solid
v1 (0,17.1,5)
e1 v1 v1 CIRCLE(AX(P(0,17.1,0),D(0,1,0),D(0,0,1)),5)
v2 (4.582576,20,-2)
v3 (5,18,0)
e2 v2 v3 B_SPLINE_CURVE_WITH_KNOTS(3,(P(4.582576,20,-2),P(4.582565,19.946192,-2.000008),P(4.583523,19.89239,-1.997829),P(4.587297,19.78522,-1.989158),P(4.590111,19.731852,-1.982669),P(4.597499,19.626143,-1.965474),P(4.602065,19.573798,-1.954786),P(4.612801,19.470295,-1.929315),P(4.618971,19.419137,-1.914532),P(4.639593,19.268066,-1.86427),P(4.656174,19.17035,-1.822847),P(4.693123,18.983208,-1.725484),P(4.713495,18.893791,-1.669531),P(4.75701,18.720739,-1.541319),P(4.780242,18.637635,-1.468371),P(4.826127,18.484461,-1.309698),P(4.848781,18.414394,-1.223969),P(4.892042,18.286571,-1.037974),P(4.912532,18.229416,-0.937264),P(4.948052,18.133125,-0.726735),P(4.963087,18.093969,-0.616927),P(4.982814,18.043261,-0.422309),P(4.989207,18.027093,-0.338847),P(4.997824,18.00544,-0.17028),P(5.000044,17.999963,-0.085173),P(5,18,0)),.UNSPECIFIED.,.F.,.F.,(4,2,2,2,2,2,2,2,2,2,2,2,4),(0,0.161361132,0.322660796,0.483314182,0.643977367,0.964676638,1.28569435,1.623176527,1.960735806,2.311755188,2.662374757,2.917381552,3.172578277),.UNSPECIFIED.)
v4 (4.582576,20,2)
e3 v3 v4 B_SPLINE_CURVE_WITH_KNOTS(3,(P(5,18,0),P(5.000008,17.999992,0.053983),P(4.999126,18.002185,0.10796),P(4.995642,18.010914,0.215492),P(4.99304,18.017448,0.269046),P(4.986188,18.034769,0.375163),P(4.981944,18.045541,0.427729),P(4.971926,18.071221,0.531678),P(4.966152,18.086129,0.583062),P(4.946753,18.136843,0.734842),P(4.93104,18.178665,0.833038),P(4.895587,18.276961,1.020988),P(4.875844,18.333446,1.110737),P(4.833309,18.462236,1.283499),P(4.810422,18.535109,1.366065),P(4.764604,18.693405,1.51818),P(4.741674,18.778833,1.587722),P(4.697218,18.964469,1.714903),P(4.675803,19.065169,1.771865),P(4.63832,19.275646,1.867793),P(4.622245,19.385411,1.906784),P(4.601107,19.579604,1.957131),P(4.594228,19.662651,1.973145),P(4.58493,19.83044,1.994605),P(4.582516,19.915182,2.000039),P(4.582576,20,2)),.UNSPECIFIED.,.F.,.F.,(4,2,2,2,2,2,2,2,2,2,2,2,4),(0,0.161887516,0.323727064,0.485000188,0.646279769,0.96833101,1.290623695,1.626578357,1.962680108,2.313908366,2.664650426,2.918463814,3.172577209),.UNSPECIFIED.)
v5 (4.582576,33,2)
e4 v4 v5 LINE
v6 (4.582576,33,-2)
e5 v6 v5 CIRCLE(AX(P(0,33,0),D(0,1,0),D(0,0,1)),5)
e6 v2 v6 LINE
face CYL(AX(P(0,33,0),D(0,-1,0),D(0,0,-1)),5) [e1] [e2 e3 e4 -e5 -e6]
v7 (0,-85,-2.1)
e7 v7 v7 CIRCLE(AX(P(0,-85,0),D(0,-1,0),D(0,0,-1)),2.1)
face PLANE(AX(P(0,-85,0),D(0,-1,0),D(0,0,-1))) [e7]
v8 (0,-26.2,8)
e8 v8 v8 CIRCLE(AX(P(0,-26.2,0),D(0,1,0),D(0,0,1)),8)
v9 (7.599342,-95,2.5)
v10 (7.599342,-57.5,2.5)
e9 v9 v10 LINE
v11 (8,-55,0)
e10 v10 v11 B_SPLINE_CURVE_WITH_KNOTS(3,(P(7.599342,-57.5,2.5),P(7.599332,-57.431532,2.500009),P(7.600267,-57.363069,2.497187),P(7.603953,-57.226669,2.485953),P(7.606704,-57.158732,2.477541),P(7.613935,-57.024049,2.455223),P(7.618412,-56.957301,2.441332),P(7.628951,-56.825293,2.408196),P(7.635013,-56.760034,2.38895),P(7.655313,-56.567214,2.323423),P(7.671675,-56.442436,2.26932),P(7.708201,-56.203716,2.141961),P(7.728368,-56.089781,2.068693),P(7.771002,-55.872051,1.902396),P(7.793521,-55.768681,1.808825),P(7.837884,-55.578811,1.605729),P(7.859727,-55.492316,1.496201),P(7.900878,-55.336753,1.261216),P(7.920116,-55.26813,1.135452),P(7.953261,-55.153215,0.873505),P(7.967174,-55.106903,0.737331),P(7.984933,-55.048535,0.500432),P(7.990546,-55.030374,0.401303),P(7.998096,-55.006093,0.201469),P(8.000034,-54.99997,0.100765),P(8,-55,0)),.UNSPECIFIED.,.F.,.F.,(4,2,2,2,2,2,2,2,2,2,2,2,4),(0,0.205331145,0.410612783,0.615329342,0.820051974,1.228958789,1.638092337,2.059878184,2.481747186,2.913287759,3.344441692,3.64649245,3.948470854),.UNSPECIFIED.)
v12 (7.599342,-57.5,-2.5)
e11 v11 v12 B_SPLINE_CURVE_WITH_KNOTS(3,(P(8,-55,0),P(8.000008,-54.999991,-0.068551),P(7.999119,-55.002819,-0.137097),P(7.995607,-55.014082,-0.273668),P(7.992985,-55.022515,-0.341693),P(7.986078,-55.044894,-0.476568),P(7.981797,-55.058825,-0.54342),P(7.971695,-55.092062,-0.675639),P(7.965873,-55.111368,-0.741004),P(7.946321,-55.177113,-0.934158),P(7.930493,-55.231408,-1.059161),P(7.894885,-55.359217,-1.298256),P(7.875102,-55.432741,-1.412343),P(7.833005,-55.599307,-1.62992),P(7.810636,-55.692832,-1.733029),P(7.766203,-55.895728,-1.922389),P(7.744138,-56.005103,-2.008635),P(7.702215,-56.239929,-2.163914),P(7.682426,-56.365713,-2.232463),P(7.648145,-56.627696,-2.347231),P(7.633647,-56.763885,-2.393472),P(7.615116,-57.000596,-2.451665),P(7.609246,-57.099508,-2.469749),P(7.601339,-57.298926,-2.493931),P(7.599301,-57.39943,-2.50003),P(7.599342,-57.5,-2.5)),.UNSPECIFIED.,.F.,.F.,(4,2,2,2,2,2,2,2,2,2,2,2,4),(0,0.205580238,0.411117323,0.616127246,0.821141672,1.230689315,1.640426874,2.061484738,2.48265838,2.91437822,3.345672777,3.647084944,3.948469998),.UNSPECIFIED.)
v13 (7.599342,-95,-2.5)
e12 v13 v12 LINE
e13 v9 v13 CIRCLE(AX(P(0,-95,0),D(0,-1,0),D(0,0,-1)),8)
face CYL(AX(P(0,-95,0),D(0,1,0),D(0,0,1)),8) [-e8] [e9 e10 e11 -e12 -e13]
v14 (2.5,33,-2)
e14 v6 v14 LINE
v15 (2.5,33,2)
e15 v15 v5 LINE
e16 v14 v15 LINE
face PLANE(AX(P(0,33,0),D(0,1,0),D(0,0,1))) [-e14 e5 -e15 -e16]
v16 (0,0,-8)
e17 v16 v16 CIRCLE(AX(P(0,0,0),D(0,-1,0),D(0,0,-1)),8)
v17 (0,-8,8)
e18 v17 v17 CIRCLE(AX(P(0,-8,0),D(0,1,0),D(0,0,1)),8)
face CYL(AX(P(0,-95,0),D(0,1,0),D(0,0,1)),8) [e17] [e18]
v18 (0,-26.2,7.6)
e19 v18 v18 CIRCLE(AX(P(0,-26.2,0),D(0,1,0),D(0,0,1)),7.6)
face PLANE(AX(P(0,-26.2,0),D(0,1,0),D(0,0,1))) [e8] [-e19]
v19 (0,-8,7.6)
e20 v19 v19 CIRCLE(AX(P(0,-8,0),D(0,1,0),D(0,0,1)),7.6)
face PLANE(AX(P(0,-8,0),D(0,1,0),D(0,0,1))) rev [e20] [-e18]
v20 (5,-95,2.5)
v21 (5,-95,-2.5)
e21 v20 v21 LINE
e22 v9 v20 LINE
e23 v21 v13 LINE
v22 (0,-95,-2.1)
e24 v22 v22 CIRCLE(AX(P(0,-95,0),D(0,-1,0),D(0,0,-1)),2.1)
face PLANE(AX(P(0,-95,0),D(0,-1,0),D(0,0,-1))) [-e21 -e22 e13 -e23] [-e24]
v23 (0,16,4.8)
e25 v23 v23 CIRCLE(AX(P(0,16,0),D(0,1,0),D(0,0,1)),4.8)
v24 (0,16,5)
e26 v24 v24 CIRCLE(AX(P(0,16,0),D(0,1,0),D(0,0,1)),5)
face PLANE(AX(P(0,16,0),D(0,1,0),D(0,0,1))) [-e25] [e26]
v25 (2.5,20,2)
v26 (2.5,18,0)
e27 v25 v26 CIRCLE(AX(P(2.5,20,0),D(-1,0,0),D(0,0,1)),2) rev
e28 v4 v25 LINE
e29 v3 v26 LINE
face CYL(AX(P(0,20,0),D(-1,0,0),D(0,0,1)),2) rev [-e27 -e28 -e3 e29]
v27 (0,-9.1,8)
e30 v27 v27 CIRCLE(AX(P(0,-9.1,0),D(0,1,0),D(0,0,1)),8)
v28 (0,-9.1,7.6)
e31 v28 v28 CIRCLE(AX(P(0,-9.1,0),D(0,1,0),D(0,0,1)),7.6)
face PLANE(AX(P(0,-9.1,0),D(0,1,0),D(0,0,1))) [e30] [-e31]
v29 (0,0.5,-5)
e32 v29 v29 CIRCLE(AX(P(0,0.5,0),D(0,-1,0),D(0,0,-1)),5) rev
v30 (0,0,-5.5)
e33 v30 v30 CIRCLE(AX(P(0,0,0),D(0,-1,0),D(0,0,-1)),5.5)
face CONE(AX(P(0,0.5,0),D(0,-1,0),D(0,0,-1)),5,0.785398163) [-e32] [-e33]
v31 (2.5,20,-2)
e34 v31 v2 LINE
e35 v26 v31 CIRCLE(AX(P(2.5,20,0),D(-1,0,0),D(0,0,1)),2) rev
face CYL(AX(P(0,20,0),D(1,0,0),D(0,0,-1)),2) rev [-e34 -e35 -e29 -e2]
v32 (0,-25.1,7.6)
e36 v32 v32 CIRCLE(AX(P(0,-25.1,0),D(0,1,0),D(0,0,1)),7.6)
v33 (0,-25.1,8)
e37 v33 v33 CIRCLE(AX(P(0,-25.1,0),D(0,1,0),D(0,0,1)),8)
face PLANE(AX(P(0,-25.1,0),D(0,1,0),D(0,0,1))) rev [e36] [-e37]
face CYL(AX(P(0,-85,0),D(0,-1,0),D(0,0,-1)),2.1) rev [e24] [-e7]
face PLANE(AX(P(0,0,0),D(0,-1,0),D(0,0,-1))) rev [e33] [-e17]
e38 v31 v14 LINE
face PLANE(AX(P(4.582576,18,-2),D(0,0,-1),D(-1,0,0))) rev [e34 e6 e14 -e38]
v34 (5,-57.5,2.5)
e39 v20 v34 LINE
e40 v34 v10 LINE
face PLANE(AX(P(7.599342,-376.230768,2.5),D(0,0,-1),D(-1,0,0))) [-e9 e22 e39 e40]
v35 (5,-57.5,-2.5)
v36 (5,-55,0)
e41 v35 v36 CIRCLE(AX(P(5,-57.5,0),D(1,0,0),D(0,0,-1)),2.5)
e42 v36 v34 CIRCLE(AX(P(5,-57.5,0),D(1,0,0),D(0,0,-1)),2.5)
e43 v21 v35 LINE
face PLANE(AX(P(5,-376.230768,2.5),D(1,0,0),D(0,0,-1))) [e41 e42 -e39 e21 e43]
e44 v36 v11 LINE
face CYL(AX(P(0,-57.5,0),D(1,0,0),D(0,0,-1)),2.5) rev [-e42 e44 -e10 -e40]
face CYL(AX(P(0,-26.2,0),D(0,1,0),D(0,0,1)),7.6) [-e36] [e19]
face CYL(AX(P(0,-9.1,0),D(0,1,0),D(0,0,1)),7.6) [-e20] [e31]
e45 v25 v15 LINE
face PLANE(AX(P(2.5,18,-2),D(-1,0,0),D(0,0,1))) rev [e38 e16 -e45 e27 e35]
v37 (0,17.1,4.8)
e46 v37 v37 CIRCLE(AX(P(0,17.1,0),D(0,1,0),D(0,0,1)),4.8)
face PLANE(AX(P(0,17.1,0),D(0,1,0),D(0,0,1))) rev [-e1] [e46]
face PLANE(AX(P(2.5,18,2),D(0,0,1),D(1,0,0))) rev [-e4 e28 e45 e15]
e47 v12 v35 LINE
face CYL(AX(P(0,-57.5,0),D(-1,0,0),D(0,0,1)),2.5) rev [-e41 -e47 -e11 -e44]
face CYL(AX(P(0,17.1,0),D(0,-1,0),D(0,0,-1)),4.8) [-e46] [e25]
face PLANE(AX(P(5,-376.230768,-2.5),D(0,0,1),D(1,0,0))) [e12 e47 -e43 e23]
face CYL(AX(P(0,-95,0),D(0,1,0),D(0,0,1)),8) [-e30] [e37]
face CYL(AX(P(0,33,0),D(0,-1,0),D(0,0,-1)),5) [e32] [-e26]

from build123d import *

# Parameters (mm, degrees)
SKETCH1_R               = 5
BOSS_EXTRUDE1_DEPTH     = 33
SKETCH2_R               = 8
BOSS_EXTRUDE2_DEPTH     = 95
CUT_EXTRUDE1_START      = -8
SKETCH3_OUTSIDE_W       = 43.996
SKETCH3_OUTSIDE_H       = 43.996
SKETCH3_OUTSIDE_R       = 7.6
CUT_EXTRUDE1_DEPTH      = 1.1
CUT_EXTRUDE2_START      = -25.1
SKETCH3_2_OUTSIDE_W     = 43.996
SKETCH3_2_OUTSIDE_H     = 43.996
SKETCH3_2_OUTSIDE_R     = 7.6
CUT_EXTRUDE2_DEPTH      = 1.1
CUT_EXTRUDE3_START      = 16
SKETCH4_OUTSIDE_W       = 43.996
SKETCH4_OUTSIDE_H       = 43.996
SKETCH4_OUTSIDE_R       = 4.8
CUT_EXTRUDE3_DEPTH      = 1.1
SKETCH5_R               = 2.1
CUT_EXTRUDE4_DEPTH      = 10
CUT_EXTRUDE5_START      = -15
CUT_EXTRUDE5_DEPTH      = 15
FILLET1_R               = 2
CUT_EXTRUDE6_DEPTH      = 129.499027333
CUT_EXTRUDE6_DEPTH_BACK = 40
FILLET2_R               = 2.5
CHAMFER1_SIZE           = 0.5


with BuildPart() as part:
    # Sketch1 → Boss-Extrude1 (new body)
    with BuildSketch(Plane(origin=(0, 0, 0), x_dir=(1, 0, 0), z_dir=(0, 1, 0))):
        with Locations(Location((0, 0, 0), (0, 0, 270))):
            Circle(SKETCH1_R)
    extrude(amount=BOSS_EXTRUDE1_DEPTH)

    # Sketch2 → Boss-Extrude2 (add)
    with BuildSketch(Plane.XZ):
        with Locations(Location((0, 0, 0), (0, 0, 270))):
            Circle(SKETCH2_R)
    extrude(amount=BOSS_EXTRUDE2_DEPTH)

    # Sketch3 outside → Cut-Extrude1 (cut)
    with BuildSketch(Plane(origin=(0, 0, 0), x_dir=(1, 0, 0), z_dir=(0, 1, 0)).offset(CUT_EXTRUDE1_START)):
        Rectangle(SKETCH3_OUTSIDE_W, SKETCH3_OUTSIDE_H)
        with Locations(Location((0, 0, 0), (0, 0, 270))):
            Circle(SKETCH3_OUTSIDE_R, mode=Mode.SUBTRACT)
    extrude(amount=-CUT_EXTRUDE1_DEPTH, mode=Mode.SUBTRACT)

    # Sketch3<2> outside → Cut-Extrude2 (cut)
    with BuildSketch(Plane(origin=(0, 0, 0), x_dir=(1, 0, 0), z_dir=(0, 1, 0)).offset(CUT_EXTRUDE2_START)):
        Rectangle(SKETCH3_2_OUTSIDE_W, SKETCH3_2_OUTSIDE_H)
        with Locations(Location((0, 0, 0), (0, 0, 270))):
            Circle(SKETCH3_2_OUTSIDE_R, mode=Mode.SUBTRACT)
    extrude(amount=-CUT_EXTRUDE2_DEPTH, mode=Mode.SUBTRACT)

    # Sketch4 outside → Cut-Extrude3 (cut)
    with BuildSketch(Plane(origin=(0, 0, 0), x_dir=(1, 0, 0), z_dir=(0, 1, 0)).offset(CUT_EXTRUDE3_START)):
        Rectangle(SKETCH4_OUTSIDE_W, SKETCH4_OUTSIDE_H)
        with Locations(Location((0, 0, 0), (0, 0, 270))):
            Circle(SKETCH4_OUTSIDE_R, mode=Mode.SUBTRACT)
    extrude(amount=CUT_EXTRUDE3_DEPTH, mode=Mode.SUBTRACT)

    # Sketch5 → Cut-Extrude4 (cut)
    with BuildSketch(Plane.XZ.offset(95)):
        with Locations(Location((0, 0, 0), (0, 0, 270))):
            Circle(SKETCH5_R)
    extrude(amount=-CUT_EXTRUDE4_DEPTH, mode=Mode.SUBTRACT)

    # Sketch6 → Cut-Extrude5 (cut)
    with BuildSketch(Plane(origin=(0, 33, 0), x_dir=(1, 0, 0), z_dir=(0, 1, 0)).offset(CUT_EXTRUDE5_START)):
        with BuildLine():
            Line((4.582575695, 2), (2.5, 2))
            Line((2.5, 2), (2.5, -2))
            Line((2.5, -2), (4.582575695, -2))
            ThreePointArc((4.582575695, -2), (5, 0), (4.582575695, 2))
        make_face()
    extrude(amount=CUT_EXTRUDE5_DEPTH, mode=Mode.SUBTRACT)

    # Fillet1
    fillet1_edges = [part.edges().sort_by_distance(p)[0] for p in [
        (3.541287847, 18, 2),
        (3.541287847, 18, -2),
    ]]
    fillet(fillet1_edges, radius=FILLET1_R - 0.0001)  # a hair under: the kernel refuses the full size

    # Sketch7 → Cut-Extrude6 (cut, two sides: drawn at the far end of the back side and taken through both)
    with BuildSketch(Plane.XZ.offset(95).offset(-CUT_EXTRUDE6_DEPTH_BACK)):
        Polygon((55.20729194, 2.5), (7.599342077, 2.5), (5, 2.5), (5, -2.5), (7.599342077, -2.5), (55.20729194, -2.5), (150.423191666, -2.5), (150.423191666, 2.5), align=None)
    extrude(amount=CUT_EXTRUDE6_DEPTH + CUT_EXTRUDE6_DEPTH_BACK, mode=Mode.SUBTRACT)

    # Fillet2
    fillet2_edges = [part.edges().sort_by_distance(p)[0] for p in [
        (6.299671038, -55, 2.5),
        (6.299671038, -55, -2.5),
    ]]
    fillet(fillet2_edges, radius=FILLET2_R - 0.0001)  # a hair under: the kernel refuses the full size

    # Chamfer1
    chamfer1_edges = [part.edges().sort_by_distance(p)[0] for p in [
        (0, 0, -5),
    ]]
    chamfer(chamfer1_edges, length=CHAMFER1_SIZE)


solid = part.part
